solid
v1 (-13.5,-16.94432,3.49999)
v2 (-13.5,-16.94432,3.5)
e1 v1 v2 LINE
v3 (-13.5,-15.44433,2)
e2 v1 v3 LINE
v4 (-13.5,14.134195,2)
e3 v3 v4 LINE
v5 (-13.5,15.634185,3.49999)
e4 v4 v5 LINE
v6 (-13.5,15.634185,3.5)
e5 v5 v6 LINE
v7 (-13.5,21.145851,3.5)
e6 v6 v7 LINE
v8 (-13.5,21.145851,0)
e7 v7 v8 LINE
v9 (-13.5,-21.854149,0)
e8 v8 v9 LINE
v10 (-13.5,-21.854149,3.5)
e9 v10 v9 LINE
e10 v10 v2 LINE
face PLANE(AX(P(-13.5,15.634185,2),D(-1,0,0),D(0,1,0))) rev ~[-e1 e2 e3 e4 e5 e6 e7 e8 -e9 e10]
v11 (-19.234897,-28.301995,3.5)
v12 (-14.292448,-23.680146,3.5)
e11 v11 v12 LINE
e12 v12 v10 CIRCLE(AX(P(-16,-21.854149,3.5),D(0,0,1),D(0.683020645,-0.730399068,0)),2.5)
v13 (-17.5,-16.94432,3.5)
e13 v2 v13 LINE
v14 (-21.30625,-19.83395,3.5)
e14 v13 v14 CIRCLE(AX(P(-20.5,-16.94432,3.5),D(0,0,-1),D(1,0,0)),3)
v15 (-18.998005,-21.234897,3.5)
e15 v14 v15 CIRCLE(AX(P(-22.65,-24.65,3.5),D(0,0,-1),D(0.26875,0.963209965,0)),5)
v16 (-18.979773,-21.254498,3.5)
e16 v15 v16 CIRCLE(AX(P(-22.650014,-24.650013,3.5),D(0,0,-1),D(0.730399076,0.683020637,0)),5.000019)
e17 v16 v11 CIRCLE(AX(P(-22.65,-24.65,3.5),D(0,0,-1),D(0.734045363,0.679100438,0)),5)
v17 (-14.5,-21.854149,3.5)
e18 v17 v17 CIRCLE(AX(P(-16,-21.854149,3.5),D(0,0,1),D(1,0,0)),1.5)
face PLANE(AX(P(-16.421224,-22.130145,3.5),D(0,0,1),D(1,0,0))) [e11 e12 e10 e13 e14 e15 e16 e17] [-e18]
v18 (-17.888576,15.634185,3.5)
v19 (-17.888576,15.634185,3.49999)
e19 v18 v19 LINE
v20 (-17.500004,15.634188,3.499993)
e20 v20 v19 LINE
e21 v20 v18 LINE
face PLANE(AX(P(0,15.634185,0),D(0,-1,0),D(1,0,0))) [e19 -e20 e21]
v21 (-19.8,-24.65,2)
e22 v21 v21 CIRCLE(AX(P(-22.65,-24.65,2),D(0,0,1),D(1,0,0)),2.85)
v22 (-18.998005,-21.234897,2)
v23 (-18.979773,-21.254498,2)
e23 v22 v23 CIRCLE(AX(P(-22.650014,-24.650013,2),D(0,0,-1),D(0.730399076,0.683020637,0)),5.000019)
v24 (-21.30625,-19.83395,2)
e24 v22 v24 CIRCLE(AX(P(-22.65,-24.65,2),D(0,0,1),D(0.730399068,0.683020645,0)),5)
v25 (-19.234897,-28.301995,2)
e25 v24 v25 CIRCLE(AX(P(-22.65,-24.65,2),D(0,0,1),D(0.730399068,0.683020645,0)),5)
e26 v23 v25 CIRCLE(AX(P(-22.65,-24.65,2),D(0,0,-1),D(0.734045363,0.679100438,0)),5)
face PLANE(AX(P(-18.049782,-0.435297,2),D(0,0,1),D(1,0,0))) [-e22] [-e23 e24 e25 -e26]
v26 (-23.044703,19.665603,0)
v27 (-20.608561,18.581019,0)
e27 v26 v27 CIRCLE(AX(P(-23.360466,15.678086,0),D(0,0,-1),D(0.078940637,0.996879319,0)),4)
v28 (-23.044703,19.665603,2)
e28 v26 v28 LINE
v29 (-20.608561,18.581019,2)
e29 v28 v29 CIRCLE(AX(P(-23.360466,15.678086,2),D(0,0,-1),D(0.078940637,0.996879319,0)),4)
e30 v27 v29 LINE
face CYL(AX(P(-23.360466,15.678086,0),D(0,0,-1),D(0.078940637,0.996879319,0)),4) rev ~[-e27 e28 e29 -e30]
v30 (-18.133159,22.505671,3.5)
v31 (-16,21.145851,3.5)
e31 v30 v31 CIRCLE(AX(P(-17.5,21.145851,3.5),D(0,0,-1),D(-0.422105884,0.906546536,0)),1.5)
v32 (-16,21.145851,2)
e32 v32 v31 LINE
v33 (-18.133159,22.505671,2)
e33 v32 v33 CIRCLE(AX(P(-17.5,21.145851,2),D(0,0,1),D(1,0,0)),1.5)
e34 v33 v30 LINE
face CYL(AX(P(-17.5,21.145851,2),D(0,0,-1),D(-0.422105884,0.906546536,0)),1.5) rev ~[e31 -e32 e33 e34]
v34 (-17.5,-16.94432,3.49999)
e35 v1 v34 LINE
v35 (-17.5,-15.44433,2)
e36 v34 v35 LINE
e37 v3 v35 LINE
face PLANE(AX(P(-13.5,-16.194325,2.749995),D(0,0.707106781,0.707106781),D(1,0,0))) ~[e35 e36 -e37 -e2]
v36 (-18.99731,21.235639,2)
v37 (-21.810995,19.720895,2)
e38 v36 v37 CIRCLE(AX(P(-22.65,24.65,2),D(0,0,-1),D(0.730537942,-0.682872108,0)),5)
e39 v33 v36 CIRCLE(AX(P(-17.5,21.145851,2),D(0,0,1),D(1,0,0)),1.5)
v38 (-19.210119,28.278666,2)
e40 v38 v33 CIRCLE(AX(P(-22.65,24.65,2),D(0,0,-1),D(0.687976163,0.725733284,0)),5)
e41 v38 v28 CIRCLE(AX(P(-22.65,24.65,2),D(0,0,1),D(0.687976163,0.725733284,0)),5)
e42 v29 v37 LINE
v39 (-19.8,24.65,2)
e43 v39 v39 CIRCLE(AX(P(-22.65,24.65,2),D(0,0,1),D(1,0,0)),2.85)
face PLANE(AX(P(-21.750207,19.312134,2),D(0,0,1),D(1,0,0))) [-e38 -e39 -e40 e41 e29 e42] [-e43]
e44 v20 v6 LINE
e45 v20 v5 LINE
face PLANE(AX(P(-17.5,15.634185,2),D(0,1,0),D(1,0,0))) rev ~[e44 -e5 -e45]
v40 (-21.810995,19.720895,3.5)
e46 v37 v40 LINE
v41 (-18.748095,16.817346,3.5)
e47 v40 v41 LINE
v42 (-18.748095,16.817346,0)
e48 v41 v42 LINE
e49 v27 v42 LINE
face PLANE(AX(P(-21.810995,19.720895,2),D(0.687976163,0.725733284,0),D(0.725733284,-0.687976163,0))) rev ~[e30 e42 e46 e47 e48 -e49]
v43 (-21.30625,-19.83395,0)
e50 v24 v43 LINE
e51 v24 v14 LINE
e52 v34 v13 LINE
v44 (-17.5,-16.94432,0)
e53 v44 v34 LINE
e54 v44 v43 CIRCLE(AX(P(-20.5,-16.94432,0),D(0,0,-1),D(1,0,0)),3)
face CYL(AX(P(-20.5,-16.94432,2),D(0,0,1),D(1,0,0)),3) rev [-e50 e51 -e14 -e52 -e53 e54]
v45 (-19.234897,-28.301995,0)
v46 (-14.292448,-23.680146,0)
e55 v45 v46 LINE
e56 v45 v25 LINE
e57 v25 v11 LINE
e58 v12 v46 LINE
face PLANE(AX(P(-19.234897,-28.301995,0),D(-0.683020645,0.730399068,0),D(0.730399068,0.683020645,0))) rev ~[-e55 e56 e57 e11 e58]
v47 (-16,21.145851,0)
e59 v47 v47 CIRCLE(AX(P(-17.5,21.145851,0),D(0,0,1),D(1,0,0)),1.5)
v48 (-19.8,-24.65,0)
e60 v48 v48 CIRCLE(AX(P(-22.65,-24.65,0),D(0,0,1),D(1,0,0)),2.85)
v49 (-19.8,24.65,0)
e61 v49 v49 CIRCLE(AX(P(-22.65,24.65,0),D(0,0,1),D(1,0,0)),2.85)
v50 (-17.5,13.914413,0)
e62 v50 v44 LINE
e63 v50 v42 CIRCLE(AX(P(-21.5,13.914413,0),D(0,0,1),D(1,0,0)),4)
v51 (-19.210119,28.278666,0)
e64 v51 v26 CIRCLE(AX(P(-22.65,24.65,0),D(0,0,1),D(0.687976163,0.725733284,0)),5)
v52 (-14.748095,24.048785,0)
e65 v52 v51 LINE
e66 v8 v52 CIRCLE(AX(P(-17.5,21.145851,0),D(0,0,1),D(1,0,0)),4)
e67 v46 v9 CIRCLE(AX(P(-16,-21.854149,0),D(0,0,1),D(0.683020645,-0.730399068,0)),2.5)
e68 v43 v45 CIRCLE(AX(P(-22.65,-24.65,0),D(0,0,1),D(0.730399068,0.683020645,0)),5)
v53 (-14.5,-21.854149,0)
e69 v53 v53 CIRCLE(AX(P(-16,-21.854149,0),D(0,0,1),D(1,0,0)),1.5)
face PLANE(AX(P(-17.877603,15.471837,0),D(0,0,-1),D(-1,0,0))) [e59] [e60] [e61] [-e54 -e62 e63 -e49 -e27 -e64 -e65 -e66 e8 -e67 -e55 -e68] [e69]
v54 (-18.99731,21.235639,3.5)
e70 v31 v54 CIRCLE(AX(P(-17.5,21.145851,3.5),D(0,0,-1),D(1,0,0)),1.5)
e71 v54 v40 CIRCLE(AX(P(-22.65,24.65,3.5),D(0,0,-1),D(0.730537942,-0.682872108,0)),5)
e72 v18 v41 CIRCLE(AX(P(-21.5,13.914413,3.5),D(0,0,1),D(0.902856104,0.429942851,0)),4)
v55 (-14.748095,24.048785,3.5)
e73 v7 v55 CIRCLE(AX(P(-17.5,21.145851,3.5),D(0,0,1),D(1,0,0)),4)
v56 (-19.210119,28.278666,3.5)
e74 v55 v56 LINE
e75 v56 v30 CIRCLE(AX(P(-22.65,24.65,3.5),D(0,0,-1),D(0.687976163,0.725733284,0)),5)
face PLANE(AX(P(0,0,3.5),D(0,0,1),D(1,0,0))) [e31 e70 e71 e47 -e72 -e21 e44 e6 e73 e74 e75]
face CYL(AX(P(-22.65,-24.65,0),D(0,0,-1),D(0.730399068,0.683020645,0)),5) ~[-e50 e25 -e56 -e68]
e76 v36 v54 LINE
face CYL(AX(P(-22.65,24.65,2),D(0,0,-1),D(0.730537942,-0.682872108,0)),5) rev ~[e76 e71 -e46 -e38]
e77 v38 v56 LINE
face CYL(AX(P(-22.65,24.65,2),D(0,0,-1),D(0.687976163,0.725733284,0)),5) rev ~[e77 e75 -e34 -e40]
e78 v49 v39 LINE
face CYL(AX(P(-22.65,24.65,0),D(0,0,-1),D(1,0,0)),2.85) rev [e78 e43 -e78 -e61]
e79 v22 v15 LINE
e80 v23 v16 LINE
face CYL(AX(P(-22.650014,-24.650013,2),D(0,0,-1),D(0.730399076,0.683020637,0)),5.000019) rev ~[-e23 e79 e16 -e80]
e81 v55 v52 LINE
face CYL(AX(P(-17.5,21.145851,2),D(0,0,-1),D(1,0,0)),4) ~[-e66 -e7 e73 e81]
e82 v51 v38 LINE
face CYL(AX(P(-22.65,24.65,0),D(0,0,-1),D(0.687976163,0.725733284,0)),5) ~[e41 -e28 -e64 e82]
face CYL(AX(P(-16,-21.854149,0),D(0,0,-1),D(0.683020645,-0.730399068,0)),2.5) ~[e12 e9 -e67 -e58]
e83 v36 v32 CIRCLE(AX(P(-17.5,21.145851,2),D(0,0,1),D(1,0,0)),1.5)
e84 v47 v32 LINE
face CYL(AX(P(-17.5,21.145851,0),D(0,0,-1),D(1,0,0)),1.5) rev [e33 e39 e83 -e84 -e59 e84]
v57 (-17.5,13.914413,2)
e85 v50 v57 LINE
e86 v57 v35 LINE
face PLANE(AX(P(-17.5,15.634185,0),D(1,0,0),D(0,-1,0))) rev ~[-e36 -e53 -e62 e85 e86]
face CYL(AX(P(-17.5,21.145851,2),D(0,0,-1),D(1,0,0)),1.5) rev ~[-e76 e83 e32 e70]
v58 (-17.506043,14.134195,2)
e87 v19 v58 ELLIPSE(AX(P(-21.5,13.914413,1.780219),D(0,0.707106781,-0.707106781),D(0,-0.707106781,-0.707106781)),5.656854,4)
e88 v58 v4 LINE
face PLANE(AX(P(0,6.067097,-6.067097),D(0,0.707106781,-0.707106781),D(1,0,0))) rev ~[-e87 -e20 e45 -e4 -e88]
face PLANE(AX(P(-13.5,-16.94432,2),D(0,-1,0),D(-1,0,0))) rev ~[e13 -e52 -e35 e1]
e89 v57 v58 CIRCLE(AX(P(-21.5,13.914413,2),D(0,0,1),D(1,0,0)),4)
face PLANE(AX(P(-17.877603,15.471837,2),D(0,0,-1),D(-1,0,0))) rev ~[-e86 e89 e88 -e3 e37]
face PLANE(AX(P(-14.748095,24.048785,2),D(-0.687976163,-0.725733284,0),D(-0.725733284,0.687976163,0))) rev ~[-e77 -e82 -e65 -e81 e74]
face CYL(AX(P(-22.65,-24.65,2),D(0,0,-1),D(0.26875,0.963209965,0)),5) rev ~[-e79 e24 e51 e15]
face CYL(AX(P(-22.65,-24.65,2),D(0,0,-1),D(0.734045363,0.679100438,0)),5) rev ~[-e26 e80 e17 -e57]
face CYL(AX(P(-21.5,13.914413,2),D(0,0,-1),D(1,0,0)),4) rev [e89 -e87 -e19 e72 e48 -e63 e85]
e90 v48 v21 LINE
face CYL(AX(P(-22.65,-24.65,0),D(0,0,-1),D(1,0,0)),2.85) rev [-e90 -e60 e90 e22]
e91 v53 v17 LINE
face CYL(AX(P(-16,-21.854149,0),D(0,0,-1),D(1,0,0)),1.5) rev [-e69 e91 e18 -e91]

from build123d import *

# Parameters (mm, degrees)
F3_R          = 2.85
F3_R_2        = 1.5
F4_DEPTH      = 2
F5_R          = 1.5
F6_DEPTH      = 1.5
F6_DEPTH_BACK = 2
F7_SIZE       = 1.49999
F8_T1_DEPTH   = 2
F8_T6_DEPTH   = 5.7994185071
F8_T12_DEPTH  = 5.7994185071


# Not quite as in the source:
# - a fillet or chamfer that OpenCascade refuses, or shapes differently, is made with other operations: its cross-section is extruded or revolved along the edge and cut away or added
# - a fillet or chamfer is up to 0.001 mm smaller than in the source, because OpenCascade refuses the exact size


with BuildPart() as f4:
    # F3 (on Top) → F4 (new body)
    with BuildSketch(Plane.XY):
        with BuildLine():
            ThreePointArc((-19.2101191839, 28.2786664177), (-27.4339393789, 26.1039339801), (-21.8109953554, 19.7208954965))
            Line((-21.8109953554, 19.7208954965), (-17.5, 15.6341847014))
            Line((-17.5, 15.6341847014), (-17.5, -19.8340624222))
            Line((-17.5, -19.8340624222), (-18.9980046584, -21.2348967768))
            ThreePointArc((-18.9980046584, -21.2348967768), (-27.6471933185, -24.4824919767), (-19.2348967768, -28.3019953416))
            Line((-19.2348967768, -28.3019953416), (-14.2924483884, -23.6801462309))
            ThreePointArc((-14.2924483884, -23.6801462309), (-13.7066532067, -22.8494176119), (-13.5, -21.8541485601))
            Line((-13.5, -21.8541485601), (-13.5, 21.1458514399))
            ThreePointArc((-13.5, 21.1458514399), (-13.8252470415, 22.7257852025), (-14.7480953471, 24.0487845741))
            Line((-14.7480953471, 24.0487845741), (-19.2101191839, 28.2786664177))
        make_face()
        with Locations((-22.65, -24.65)):
            Circle(F3_R, mode=Mode.SUBTRACT)
        with Locations((-16, -21.8541485601)):
            Circle(F3_R_2, mode=Mode.SUBTRACT)
        with Locations((-22.65, 24.65)):
            Circle(F3_R, mode=Mode.SUBTRACT)
        with Locations((-17.5, 21.1458514399)):
            Circle(F3_R_2, mode=Mode.SUBTRACT)
    extrude(amount=F4_DEPTH)

    # F5 (on face) → F6 (join, two sides)
    with BuildSketch(Plane.XY.offset(2)) as f6_sk:
        with BuildLine():
            ThreePointArc((-18.9973102923, 21.2356394597), (-20.2798856869, 20.2474373209), (-21.8109953554, 19.7208954965))
            Line((-21.8109953554, 19.7208954965), (-17.5, 15.6341847014))
            Line((-17.5, 15.6341847014), (-13.5, 15.6341847014))
            Line((-13.5, 15.6341847014), (-13.5, 21.1458514399))
            ThreePointArc((-13.5, 21.1458514399), (-13.8252470415, 22.7257852025), (-14.7480953471, 24.0487845741))
            Line((-14.7480953471, 24.0487845741), (-19.2101191839, 28.2786664177))
            ThreePointArc((-19.2101191839, 28.2786664177), (-17.7347965939, 25.5669380986), (-18.1331588264, 22.5056712444))
            ThreePointArc((-18.1331588264, 22.5056712444), (-16.6936930608, 22.410710768), (-16, 21.1458514399))
            ThreePointArc((-16, 21.1458514399), (-17.5449141487, 19.6465240176), (-18.9973102923, 21.2356394597))
        make_face()
        with BuildLine():
            Line((-13.5, -16.9443202766), (-17.5, -16.9443202766))
            Line((-17.5, -16.9443202766), (-17.5, -19.8340624222))
            Line((-17.5, -19.8340624222), (-18.9980046584, -21.2348967768))
            ThreePointArc((-18.9980046584, -21.2348967768), (-18.9888758035, -21.2446850928), (-18.9797731837, -21.2544978108))
            ThreePointArc((-18.9797731837, -21.2544978108), (-17.6532729909, -24.8308844832), (-19.2348967768, -28.3019953416))
            Line((-19.2348967768, -28.3019953416), (-14.2924483884, -23.6801462309))
            ThreePointArc((-14.2924483884, -23.6801462309), (-13.7066532067, -22.8494176119), (-13.5, -21.8541485601))
            Line((-13.5, -21.8541485601), (-13.5, -16.9443202766))
        make_face()
        with Locations((-16, -21.8541485601)):
            Circle(F5_R, mode=Mode.SUBTRACT)
        with BuildLine():
            Line((-17.5, -19.8340624222), (-17.5, -16.9443202766))
            ThreePointArc((-17.5, -16.9443202766), (-18.6859920066, -19.3337501249), (-21.30625, -19.8339501729))
            ThreePointArc((-21.30625, -19.8339501729), (-20.0557697237, -20.3756615396), (-18.9980046584, -21.2348967768))
            Line((-18.9980046584, -21.2348967768), (-17.5, -19.8340624222))
        make_face()
    extrude(amount=F6_DEPTH)
    extrude(f6_sk.sketch, amount=-F6_DEPTH_BACK)

    # F7 (size 1.5 in the source; OpenCascade refuses exactly that, so slightly less here)
    f7_edges = [f4.edges().sort_by_distance(p)[0] for p in [
        (-15.5, -16.94432, 2),
        (-15.5, 15.634185, 2),
    ]]
    chamfer(f7_edges, length=F7_SIZE)

    # F8: fillet of radius 4 on 2 edges, made by hand

    # F8_s2 → F8_t1 (join)
    with BuildSketch(Plane.XY):
        with BuildLine():
            ThreePointArc((-17.5, 13.9144132985), (-17.8252470415, 15.4943470611), (-18.7480953471, 16.8173464327))
            Line((-18.7480953471, 16.8173464327), (-17.5, 15.6341847014))
            Line((-17.5, 15.6341847014), (-17.5, 13.9144132985))
        make_face()
        with BuildLine():
            ThreePointArc((-23.0447031853, 19.6656034071), (-21.7335895232, 19.3322992897), (-20.6085610806, 18.5810192669))
            Line((-20.6085610806, 18.5810192669), (-21.8109953554, 19.7208954965))
            ThreePointArc((-21.8109953554, 19.7208954965), (-22.4261356427, 19.6550140391), (-23.0447031853, 19.6656034071))
        make_face()
    extrude(amount=F8_T1_DEPTH)


with BuildPart() as f8_tool4:
    # F8_s5 → F8_t6 (new body)
    with BuildSketch(Plane.XY.offset(2)):
        with BuildLine():
            ThreePointArc((-17.5, 13.9144132985), (-17.8252470415, 15.4943470611), (-18.7480953471, 16.8173464327))
            Line((-18.7480953471, 16.8173464327), (-17.5, 15.6341847014))
            Line((-17.5, 15.6341847014), (-17.5, 13.9144132985))
        make_face()
    extrude(amount=F8_T6_DEPTH)

    split(bisect_by=Plane(origin=(0, 6.0670973507, -6.0670973507), x_dir=(1, 0, 0), z_dir=(0, 0.7071067812, -0.7071067812)), keep=Keep.TOP)

    split(bisect_by=Plane.XY.offset(3.5), keep=Keep.BOTTOM)


with BuildPart() as f4_1:
    add(f4.part)

    # F8_t3: union F8_tool4
    add(f8_tool4.part)


with BuildPart() as f8_tool10:
    # F8_s11 → F8_t12 (new body)
    with BuildSketch(Plane.XY.offset(2)):
        with BuildLine():
            ThreePointArc((-17.5, 13.9144132985), (-17.8252470415, 15.4943470611), (-18.7480953471, 16.8173464327))
            Line((-18.7480953471, 16.8173464327), (-17.5, 15.6341847014))
            Line((-17.5, 15.6341847014), (-17.5, 13.9144132985))
        make_face()
    extrude(amount=F8_T12_DEPTH)

    split(bisect_by=Plane.XZ.offset(-15.6341847014), keep=Keep.BOTTOM)

    split(bisect_by=Plane.XY.offset(3.5), keep=Keep.BOTTOM)


with BuildPart() as f4_2:
    add(f4_1.part)

    # F8_t9: union F8_tool10
    add(f8_tool10.part)


solid = f4_2.part
